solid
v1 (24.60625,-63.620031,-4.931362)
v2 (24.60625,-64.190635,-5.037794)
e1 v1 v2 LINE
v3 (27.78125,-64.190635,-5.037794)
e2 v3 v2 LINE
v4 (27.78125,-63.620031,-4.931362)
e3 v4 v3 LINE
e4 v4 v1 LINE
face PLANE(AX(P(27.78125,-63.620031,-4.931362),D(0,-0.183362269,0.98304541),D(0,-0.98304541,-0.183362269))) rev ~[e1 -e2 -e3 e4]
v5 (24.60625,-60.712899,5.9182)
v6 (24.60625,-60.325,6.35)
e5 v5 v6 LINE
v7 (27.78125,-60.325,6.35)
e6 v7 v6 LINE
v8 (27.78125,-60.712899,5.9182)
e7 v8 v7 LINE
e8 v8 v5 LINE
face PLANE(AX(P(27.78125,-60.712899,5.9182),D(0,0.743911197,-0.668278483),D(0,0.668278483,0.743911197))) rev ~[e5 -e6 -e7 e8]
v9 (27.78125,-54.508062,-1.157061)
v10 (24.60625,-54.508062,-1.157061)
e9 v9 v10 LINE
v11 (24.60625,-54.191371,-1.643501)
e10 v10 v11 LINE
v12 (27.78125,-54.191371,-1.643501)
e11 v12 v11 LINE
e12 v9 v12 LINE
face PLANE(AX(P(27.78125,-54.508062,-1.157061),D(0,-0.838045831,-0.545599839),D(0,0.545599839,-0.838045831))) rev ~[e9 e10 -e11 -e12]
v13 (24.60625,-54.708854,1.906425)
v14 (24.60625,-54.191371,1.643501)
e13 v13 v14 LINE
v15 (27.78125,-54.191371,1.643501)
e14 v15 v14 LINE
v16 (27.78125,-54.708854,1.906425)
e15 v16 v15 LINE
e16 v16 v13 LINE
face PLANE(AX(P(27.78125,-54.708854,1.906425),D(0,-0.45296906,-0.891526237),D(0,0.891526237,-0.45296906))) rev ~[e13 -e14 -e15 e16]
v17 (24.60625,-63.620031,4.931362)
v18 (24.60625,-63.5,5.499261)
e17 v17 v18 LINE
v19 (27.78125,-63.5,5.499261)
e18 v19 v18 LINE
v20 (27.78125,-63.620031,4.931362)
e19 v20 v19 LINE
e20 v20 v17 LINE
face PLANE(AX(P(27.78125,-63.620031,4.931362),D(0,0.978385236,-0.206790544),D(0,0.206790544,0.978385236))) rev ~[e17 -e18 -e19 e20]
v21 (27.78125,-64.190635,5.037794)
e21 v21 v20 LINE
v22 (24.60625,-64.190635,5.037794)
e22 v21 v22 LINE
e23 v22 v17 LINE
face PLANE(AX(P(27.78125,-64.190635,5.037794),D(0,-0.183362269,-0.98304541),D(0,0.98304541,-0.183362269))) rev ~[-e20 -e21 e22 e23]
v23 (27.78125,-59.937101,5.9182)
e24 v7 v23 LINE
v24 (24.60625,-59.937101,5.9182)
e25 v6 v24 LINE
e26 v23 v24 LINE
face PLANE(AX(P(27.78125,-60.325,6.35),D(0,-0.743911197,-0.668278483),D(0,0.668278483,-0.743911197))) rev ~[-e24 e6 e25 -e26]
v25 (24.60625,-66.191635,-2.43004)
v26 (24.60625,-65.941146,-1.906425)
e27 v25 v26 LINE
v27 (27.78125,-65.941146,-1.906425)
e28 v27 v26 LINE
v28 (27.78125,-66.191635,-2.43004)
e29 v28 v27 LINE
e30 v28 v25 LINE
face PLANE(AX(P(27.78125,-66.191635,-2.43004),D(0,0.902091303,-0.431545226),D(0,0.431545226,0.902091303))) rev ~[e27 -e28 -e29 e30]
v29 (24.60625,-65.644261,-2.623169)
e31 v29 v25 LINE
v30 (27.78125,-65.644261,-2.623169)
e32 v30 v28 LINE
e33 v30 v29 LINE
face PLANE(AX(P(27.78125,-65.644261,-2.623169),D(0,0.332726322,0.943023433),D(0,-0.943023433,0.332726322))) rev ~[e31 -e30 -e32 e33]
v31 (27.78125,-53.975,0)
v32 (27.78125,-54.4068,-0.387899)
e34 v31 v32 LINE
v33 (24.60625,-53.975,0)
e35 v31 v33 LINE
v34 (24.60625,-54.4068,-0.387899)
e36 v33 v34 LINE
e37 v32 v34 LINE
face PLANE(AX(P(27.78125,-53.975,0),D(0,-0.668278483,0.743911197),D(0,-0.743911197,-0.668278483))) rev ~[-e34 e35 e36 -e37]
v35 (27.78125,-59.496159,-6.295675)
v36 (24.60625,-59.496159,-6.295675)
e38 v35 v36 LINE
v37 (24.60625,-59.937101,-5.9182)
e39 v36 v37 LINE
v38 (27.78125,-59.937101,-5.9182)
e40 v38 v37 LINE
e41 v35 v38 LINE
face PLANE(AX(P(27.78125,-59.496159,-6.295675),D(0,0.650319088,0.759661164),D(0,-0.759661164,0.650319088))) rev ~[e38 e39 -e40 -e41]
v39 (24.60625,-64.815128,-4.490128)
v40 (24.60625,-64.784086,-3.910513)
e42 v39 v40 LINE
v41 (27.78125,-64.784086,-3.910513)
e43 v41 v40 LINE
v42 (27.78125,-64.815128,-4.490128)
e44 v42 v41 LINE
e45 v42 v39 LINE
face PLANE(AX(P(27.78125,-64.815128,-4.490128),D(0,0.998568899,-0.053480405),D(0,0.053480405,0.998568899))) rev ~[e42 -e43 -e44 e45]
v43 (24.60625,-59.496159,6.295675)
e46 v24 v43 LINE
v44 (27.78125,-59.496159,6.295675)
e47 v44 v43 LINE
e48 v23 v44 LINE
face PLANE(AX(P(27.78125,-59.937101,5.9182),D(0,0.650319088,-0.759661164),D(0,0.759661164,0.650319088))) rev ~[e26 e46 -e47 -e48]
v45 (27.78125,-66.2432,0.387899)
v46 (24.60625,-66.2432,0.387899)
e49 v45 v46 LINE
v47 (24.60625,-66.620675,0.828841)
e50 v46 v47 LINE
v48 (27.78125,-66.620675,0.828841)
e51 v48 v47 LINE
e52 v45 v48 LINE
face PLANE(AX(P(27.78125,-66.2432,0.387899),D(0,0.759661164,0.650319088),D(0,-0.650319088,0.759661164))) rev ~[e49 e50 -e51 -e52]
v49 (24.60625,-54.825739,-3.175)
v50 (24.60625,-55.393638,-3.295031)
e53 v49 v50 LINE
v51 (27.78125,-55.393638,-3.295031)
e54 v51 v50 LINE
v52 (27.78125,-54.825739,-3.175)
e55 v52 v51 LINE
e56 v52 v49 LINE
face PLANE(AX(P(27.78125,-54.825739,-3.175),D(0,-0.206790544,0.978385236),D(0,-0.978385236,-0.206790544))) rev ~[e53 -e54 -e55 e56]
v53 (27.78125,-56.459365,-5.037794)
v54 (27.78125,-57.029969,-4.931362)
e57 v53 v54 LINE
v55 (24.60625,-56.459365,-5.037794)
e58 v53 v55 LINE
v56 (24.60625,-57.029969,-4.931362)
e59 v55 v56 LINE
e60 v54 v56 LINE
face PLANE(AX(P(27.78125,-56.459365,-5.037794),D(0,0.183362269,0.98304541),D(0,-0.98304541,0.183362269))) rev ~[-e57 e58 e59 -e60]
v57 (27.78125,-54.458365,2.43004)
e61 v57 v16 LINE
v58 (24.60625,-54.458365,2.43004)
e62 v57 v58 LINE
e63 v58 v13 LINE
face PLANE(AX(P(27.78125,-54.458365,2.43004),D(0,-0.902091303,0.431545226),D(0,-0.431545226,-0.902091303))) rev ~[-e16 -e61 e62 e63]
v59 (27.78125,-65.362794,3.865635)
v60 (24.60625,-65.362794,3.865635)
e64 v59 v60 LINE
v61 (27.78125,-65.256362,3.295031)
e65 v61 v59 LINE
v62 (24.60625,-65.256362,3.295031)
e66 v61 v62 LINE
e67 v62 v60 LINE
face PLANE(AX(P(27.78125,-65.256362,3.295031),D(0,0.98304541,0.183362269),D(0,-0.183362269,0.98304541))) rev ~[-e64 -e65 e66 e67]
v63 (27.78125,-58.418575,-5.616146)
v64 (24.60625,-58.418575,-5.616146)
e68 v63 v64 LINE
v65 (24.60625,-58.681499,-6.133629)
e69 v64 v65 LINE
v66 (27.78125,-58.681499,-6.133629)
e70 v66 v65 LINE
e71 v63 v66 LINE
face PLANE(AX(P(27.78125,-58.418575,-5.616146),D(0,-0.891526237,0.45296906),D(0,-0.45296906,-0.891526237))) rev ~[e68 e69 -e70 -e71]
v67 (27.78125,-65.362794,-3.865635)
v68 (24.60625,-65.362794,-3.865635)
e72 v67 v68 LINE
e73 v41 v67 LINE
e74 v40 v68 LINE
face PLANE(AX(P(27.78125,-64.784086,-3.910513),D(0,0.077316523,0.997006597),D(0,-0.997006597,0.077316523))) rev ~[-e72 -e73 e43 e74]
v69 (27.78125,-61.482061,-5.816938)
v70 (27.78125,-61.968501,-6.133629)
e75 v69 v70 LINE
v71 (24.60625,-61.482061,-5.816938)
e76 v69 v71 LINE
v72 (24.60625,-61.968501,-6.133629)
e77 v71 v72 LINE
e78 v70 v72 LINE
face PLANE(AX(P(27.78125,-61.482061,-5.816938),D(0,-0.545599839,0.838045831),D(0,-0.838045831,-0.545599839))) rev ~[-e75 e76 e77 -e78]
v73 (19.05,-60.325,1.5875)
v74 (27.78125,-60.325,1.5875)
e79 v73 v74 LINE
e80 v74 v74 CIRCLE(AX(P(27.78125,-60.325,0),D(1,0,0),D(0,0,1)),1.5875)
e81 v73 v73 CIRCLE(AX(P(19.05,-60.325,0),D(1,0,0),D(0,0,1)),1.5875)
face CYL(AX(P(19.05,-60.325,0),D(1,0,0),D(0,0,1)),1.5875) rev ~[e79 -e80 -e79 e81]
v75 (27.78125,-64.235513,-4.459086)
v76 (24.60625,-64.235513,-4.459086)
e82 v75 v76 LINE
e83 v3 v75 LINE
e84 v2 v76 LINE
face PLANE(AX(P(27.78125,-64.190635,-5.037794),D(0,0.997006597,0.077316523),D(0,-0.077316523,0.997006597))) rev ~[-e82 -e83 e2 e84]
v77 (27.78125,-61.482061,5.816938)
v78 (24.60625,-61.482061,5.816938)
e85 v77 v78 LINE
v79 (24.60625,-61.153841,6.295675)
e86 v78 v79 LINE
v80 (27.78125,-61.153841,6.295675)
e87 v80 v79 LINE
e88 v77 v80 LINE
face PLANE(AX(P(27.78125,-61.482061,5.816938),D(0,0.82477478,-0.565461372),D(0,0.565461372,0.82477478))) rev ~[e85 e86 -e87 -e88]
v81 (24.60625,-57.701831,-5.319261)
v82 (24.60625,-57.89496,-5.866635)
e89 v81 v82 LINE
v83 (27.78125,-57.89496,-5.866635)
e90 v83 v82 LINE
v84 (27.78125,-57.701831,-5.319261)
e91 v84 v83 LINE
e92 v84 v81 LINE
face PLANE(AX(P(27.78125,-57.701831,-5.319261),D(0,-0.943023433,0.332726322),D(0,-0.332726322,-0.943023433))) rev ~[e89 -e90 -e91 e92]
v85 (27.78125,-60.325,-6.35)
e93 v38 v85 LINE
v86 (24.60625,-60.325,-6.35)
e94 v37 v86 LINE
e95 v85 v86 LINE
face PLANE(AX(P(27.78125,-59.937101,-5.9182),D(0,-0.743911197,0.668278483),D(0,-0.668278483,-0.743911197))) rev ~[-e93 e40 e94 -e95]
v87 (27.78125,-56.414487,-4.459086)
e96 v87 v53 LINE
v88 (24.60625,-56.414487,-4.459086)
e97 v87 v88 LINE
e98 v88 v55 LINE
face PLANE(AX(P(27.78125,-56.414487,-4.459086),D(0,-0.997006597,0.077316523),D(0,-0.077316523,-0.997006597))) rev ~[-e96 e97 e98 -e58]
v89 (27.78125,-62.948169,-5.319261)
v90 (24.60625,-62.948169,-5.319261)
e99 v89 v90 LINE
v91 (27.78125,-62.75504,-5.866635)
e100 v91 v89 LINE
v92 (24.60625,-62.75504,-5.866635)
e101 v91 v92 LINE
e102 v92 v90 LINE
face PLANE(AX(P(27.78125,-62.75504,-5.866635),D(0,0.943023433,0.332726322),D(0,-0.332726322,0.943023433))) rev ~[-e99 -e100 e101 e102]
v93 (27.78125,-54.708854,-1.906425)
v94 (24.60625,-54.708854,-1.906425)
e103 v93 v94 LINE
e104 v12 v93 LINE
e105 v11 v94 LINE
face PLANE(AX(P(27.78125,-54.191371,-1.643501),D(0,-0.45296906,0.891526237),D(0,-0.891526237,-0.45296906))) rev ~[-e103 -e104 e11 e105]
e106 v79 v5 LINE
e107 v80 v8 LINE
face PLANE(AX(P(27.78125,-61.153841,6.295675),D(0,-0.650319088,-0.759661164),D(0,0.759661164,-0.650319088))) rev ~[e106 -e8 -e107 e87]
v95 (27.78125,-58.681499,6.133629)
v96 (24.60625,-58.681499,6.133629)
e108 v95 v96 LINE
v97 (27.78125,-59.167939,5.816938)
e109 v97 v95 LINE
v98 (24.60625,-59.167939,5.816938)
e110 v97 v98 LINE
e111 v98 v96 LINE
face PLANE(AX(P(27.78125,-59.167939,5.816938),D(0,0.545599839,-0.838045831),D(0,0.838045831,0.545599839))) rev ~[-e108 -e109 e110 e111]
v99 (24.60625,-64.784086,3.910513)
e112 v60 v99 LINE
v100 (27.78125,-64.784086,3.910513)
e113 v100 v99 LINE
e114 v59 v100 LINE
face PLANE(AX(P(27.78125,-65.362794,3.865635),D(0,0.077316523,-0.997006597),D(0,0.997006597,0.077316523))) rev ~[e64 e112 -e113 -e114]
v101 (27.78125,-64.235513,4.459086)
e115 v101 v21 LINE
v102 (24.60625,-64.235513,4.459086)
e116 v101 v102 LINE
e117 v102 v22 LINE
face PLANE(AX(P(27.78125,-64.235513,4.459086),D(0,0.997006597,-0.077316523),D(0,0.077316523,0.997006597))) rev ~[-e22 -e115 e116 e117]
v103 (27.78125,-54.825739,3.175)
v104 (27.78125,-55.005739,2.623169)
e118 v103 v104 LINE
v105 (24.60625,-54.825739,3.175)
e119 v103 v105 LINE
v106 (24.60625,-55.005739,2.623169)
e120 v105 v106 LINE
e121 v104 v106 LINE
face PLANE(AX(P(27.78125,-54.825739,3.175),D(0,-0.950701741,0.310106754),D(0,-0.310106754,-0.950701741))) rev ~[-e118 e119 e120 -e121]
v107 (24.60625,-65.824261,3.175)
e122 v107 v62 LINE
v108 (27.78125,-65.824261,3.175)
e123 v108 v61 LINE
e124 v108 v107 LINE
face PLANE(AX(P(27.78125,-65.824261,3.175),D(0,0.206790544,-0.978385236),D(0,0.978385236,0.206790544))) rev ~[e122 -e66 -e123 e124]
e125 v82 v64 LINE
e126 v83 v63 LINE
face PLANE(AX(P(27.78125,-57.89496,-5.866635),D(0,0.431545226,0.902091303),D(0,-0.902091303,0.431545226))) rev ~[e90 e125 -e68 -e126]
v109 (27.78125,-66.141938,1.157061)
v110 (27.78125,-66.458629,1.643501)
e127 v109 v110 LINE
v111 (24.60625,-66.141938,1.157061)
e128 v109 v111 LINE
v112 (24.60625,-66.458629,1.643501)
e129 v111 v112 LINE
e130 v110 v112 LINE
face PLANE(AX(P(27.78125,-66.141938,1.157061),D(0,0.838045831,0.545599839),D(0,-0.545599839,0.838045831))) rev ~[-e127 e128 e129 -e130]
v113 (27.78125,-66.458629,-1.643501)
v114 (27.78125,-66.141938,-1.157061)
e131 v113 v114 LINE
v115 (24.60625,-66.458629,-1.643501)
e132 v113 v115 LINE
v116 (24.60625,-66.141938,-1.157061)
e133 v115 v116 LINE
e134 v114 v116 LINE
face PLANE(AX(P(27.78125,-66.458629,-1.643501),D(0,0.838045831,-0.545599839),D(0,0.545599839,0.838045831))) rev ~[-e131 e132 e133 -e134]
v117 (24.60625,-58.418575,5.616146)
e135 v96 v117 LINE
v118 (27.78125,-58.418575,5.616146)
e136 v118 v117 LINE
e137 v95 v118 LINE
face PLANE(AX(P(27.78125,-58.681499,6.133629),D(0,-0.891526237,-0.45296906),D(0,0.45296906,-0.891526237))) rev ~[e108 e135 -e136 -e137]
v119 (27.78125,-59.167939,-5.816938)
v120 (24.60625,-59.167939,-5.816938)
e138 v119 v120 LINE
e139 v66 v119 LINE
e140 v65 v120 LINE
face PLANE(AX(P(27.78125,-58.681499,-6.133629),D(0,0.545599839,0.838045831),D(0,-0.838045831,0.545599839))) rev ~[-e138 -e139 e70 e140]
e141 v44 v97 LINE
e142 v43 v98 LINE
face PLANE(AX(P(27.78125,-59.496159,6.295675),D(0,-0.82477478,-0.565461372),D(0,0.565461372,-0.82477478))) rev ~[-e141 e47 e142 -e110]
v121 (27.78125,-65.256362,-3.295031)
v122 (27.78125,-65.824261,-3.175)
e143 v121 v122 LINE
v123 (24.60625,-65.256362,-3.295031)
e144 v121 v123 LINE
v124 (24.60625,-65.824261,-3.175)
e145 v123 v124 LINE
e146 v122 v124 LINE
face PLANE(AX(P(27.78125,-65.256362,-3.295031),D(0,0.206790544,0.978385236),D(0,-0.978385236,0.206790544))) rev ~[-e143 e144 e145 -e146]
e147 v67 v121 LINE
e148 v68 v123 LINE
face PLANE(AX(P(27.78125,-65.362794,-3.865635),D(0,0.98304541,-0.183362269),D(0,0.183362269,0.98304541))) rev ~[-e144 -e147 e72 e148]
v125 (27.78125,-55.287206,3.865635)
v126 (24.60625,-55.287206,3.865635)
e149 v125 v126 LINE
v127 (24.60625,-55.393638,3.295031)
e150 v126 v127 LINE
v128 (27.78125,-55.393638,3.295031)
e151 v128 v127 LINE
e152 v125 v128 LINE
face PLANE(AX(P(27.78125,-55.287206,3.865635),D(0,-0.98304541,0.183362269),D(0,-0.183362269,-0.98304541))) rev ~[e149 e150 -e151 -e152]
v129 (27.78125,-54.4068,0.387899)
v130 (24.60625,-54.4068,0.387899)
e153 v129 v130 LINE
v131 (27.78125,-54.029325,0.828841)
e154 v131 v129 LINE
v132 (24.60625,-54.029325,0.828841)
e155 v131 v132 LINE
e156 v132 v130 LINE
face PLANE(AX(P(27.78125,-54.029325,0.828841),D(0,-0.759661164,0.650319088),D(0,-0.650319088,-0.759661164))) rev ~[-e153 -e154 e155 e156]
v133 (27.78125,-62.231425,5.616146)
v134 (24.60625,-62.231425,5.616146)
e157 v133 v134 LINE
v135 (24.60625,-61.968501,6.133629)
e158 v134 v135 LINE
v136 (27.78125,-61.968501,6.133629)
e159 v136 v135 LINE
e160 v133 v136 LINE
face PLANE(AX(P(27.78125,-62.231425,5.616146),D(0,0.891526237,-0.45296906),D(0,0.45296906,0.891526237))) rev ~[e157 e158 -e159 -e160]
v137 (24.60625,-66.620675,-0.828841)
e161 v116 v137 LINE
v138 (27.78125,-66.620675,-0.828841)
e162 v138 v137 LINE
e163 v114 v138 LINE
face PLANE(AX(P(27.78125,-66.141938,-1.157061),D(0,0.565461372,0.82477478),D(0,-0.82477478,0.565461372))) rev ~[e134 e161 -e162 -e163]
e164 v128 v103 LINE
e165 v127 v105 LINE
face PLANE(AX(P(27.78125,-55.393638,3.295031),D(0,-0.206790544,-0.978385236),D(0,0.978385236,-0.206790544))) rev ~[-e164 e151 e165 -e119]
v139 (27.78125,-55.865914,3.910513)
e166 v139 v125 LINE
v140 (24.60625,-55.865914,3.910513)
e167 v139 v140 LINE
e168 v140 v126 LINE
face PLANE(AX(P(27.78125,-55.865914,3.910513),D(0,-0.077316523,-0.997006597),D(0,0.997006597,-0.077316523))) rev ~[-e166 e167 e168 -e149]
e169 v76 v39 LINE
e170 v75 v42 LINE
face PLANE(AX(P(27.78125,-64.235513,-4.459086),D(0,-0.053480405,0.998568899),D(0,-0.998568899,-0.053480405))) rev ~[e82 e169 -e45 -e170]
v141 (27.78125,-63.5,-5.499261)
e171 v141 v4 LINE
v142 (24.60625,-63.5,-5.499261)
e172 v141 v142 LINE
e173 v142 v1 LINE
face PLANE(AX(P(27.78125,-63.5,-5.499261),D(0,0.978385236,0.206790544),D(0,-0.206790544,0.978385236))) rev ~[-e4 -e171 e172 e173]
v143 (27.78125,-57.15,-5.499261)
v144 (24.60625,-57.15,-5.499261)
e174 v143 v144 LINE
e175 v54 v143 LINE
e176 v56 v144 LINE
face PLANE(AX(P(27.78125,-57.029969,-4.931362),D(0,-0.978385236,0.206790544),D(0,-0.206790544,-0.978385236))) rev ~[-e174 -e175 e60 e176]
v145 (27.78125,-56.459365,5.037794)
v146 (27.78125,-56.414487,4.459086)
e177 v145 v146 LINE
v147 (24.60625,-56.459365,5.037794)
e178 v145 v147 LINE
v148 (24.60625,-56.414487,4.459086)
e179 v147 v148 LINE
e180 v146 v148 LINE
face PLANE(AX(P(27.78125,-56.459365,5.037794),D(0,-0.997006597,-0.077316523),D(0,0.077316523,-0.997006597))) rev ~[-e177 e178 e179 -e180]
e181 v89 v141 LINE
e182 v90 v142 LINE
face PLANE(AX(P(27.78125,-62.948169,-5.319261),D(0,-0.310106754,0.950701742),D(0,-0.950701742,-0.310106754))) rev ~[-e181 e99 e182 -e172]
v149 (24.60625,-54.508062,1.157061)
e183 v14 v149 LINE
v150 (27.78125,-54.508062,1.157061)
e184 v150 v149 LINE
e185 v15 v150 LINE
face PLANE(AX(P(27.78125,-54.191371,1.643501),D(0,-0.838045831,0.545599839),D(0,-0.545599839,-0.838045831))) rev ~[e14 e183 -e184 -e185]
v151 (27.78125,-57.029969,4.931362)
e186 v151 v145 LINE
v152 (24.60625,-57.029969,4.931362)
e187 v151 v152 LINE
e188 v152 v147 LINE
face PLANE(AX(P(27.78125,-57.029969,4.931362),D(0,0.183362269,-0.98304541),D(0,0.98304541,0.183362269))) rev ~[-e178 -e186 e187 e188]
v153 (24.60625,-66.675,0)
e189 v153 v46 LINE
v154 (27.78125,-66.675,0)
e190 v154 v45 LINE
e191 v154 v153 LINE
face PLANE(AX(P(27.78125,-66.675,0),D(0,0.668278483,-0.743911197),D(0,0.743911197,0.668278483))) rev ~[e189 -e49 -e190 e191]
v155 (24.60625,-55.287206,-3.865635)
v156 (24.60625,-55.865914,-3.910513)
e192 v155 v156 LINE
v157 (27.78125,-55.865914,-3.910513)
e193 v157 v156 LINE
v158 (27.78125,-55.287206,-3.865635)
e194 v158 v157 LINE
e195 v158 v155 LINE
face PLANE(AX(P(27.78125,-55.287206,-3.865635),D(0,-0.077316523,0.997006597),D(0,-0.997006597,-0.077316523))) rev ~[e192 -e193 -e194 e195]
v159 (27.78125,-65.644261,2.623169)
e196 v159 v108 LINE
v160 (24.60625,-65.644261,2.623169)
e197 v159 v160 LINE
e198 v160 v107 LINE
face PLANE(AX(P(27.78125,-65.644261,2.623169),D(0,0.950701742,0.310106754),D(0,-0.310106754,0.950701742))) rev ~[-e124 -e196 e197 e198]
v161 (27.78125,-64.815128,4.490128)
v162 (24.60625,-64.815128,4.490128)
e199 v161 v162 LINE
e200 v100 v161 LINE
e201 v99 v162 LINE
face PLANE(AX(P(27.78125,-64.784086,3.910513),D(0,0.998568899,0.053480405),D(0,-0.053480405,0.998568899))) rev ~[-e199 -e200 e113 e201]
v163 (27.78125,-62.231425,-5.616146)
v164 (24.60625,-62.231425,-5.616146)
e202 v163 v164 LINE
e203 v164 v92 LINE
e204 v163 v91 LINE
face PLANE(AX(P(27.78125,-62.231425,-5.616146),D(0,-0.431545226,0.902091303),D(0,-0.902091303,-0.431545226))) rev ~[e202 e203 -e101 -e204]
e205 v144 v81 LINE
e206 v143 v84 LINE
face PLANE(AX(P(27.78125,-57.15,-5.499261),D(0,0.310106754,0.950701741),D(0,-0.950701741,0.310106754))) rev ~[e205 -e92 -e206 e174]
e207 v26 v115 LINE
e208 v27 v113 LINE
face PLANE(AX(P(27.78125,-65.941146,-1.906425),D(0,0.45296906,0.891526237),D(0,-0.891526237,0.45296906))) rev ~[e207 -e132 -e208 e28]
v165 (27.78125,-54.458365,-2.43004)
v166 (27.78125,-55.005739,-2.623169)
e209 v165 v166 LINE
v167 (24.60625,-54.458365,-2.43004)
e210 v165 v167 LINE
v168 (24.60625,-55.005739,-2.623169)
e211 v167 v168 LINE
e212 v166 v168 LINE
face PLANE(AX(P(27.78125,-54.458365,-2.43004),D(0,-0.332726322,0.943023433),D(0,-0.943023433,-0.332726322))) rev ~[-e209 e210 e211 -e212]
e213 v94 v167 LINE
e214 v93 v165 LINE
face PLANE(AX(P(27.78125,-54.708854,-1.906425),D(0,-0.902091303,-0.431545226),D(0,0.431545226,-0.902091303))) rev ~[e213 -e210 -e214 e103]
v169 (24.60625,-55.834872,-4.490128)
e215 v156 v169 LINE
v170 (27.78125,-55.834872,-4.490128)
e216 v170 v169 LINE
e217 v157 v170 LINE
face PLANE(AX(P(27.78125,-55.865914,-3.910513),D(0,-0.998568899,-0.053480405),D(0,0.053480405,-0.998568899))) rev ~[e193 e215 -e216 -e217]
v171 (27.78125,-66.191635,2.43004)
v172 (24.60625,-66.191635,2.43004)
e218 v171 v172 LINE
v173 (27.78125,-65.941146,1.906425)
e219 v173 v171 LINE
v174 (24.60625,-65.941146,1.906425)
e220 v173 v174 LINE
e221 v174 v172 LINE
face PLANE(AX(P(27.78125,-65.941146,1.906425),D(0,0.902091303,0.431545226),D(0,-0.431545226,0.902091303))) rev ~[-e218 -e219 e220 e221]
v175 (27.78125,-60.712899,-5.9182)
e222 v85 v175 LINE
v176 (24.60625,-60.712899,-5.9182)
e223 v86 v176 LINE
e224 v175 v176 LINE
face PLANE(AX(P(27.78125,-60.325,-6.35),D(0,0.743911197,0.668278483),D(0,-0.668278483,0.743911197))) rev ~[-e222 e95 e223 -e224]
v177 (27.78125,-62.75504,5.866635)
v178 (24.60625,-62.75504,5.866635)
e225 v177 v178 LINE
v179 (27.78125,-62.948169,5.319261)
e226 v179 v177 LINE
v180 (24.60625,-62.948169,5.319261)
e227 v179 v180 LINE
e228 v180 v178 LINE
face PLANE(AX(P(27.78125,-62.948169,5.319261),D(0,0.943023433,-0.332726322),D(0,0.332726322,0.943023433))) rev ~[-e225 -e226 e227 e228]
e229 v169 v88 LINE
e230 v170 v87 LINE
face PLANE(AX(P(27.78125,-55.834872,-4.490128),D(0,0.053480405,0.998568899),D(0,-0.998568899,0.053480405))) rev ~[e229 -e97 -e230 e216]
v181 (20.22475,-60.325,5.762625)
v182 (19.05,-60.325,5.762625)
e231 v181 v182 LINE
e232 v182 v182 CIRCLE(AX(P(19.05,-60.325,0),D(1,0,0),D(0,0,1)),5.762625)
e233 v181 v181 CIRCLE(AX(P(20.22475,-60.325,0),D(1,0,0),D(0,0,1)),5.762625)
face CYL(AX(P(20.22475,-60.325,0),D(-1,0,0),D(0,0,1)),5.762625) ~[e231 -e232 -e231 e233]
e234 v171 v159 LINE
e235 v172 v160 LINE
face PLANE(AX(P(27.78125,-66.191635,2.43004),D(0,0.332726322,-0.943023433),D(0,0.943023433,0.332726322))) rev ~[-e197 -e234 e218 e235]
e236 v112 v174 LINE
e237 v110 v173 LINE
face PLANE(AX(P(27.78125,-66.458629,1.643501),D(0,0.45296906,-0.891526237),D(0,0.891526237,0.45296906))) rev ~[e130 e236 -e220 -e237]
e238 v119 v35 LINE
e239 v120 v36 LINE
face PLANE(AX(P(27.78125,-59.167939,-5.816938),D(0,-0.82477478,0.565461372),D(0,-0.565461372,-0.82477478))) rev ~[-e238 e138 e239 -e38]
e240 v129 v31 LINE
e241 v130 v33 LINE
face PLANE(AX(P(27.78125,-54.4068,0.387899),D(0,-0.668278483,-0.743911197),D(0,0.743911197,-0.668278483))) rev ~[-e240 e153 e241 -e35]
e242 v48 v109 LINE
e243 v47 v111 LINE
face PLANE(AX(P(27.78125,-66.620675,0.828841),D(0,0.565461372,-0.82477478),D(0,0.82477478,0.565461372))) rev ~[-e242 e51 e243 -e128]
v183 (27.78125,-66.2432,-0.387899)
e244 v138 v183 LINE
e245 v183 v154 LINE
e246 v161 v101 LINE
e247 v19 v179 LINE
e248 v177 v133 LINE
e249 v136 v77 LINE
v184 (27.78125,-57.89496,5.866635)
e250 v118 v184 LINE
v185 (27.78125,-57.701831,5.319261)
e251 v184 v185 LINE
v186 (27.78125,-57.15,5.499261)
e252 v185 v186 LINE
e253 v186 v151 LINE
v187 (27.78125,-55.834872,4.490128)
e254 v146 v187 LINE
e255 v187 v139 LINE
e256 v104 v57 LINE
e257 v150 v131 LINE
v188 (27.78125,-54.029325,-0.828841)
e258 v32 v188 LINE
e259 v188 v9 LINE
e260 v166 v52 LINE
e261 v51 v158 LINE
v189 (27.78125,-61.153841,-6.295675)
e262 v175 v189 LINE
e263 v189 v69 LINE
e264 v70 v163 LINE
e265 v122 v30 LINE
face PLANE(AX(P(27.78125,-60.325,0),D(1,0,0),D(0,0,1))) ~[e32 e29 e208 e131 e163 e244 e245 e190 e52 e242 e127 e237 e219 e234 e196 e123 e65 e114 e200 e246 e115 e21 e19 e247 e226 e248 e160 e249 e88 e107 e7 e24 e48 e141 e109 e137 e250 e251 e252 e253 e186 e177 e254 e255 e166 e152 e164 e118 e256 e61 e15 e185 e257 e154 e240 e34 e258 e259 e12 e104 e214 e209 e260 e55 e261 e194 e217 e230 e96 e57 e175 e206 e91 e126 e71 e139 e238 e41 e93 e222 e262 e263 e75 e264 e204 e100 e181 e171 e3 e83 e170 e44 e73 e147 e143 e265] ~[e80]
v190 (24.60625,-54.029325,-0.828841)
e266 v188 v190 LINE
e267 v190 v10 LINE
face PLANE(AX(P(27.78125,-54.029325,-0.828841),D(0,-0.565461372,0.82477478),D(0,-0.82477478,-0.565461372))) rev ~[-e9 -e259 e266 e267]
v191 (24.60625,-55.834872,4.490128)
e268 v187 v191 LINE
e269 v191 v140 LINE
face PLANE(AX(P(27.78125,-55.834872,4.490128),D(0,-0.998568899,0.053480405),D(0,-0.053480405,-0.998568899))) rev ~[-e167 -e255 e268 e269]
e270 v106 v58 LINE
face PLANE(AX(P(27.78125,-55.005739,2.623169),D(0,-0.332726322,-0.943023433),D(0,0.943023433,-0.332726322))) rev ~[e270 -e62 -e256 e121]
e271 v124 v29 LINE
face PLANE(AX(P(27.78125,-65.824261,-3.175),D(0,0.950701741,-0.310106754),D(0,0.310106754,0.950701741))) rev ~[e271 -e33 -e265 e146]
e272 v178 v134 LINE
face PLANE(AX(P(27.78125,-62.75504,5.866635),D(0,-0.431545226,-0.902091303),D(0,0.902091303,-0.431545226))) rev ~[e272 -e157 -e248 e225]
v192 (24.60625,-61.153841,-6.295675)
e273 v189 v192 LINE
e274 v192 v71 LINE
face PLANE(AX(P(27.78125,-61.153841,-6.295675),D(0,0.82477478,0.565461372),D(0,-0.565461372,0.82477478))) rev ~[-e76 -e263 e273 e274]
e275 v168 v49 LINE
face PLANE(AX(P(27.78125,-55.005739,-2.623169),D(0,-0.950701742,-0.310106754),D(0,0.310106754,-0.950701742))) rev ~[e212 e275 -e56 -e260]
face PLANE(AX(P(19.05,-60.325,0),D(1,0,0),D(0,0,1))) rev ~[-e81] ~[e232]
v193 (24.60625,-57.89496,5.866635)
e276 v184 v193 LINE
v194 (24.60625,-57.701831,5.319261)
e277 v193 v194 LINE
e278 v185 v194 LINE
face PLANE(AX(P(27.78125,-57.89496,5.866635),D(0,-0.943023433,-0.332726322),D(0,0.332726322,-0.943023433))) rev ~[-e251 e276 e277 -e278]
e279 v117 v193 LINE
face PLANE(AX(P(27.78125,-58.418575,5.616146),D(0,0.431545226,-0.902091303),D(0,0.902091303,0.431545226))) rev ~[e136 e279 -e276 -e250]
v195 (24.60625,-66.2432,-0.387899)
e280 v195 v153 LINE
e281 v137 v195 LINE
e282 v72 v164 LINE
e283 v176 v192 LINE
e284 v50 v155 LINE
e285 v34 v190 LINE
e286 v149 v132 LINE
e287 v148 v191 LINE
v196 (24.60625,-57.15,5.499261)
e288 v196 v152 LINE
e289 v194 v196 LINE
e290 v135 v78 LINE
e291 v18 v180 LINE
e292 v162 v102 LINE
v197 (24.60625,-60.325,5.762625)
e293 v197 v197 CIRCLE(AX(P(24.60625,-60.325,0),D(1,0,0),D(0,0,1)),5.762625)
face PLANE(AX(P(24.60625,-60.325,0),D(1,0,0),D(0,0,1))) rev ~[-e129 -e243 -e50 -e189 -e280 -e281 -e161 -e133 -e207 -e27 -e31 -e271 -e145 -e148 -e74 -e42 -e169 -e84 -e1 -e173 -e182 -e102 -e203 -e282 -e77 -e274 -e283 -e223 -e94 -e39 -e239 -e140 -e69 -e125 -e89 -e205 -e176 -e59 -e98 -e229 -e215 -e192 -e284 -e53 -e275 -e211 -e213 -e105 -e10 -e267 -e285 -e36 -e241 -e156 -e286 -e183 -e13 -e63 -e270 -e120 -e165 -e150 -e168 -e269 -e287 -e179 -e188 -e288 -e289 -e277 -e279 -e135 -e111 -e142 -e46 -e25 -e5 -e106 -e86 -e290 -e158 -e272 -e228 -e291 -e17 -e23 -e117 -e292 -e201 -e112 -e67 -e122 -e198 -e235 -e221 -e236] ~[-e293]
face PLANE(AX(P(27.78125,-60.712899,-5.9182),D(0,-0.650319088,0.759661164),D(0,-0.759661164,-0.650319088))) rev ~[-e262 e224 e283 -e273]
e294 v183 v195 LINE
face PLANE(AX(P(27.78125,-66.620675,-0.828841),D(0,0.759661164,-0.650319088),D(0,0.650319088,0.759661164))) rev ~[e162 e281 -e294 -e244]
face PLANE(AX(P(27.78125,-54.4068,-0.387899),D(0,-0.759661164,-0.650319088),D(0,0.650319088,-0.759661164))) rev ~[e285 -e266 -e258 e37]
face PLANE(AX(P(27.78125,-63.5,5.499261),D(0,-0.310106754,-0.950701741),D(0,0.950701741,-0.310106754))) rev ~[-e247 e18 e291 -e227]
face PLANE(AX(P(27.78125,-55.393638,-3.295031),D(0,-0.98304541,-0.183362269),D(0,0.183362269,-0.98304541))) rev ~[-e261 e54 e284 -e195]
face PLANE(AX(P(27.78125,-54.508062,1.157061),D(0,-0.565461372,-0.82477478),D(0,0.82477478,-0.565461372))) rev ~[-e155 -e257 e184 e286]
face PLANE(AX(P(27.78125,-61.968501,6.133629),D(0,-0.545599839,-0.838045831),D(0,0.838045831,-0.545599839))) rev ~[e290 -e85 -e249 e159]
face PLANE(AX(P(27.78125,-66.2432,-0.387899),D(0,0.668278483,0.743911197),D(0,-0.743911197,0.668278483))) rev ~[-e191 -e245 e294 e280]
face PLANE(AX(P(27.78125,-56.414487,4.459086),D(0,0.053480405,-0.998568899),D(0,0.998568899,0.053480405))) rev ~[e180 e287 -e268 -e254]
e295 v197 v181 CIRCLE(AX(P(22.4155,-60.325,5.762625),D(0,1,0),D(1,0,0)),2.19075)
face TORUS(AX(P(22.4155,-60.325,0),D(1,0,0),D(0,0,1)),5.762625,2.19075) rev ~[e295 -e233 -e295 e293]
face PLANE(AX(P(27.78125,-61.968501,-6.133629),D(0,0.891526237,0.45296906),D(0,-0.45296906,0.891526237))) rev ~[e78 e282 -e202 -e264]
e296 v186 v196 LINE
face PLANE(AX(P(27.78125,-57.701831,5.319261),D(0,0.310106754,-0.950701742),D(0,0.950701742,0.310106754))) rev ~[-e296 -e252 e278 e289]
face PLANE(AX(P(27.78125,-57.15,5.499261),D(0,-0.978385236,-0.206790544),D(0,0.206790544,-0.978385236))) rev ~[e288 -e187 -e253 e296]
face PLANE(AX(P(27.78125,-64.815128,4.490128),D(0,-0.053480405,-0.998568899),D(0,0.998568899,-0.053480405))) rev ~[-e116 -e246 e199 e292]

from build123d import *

# Parameters (mm, degrees)
F4_DEPTH        = 3.175
F4_COPIES_COUNT = 48


# Not quite as in the source:
# - a pattern or mirror of a feature is missing from the dataset's text; its kind, count and spacing are read off the source's solid


with BuildPart() as f2:
    # F1 (on offset) → F2 (revolve)
    with BuildSketch(Plane.XZ.offset(60.325)):
        with BuildLine():
            Line((19.05, 5.762625), (19.05, 1.5875))
            Line((19.05, 1.5875), (27.78125, 1.5875))
            Line((27.78125, 1.5875), (27.78125, 6.35))
            Line((27.78125, 6.35), (24.60625, 6.35))
            Line((24.60625, 6.35), (24.60625, 5.762625))
            ThreePointArc((24.60625, 5.762625), (22.4155, 3.571875), (20.22475, 5.762625))
            Line((20.22475, 5.762625), (19.05, 5.762625))
        make_face()
    revolve(axis=Axis((0, -60.325, 0), (1, 0, 0)))

    # F3 (on face) → F4 (cut, through all)
    with BuildSketch(Plane.YZ.offset(27.78125)):
        with BuildLine():
            ThreePointArc((-59.4961586794, 6.2956748697), (-59.9096901294, 6.3364041626), (-60.325, 6.35))
            Line((-60.325, 6.35), (-59.9371006784, 5.9182))
            Line((-59.9371006784, 5.9182), (-59.4961586794, 6.2956748697))
        make_face()
    f4 = extrude(amount=-F4_DEPTH, mode=Mode.SUBTRACT)

    # F4_copies: F4 ×48 about axis
    f4_copies_axis = Axis((0, -60.325, 0), (1, 0, 0))
    for i in range(1, F4_COPIES_COUNT):
        add(f4.rotate(f4_copies_axis, i * 360 / F4_COPIES_COUNT), mode=Mode.SUBTRACT)


solid = f2.part
